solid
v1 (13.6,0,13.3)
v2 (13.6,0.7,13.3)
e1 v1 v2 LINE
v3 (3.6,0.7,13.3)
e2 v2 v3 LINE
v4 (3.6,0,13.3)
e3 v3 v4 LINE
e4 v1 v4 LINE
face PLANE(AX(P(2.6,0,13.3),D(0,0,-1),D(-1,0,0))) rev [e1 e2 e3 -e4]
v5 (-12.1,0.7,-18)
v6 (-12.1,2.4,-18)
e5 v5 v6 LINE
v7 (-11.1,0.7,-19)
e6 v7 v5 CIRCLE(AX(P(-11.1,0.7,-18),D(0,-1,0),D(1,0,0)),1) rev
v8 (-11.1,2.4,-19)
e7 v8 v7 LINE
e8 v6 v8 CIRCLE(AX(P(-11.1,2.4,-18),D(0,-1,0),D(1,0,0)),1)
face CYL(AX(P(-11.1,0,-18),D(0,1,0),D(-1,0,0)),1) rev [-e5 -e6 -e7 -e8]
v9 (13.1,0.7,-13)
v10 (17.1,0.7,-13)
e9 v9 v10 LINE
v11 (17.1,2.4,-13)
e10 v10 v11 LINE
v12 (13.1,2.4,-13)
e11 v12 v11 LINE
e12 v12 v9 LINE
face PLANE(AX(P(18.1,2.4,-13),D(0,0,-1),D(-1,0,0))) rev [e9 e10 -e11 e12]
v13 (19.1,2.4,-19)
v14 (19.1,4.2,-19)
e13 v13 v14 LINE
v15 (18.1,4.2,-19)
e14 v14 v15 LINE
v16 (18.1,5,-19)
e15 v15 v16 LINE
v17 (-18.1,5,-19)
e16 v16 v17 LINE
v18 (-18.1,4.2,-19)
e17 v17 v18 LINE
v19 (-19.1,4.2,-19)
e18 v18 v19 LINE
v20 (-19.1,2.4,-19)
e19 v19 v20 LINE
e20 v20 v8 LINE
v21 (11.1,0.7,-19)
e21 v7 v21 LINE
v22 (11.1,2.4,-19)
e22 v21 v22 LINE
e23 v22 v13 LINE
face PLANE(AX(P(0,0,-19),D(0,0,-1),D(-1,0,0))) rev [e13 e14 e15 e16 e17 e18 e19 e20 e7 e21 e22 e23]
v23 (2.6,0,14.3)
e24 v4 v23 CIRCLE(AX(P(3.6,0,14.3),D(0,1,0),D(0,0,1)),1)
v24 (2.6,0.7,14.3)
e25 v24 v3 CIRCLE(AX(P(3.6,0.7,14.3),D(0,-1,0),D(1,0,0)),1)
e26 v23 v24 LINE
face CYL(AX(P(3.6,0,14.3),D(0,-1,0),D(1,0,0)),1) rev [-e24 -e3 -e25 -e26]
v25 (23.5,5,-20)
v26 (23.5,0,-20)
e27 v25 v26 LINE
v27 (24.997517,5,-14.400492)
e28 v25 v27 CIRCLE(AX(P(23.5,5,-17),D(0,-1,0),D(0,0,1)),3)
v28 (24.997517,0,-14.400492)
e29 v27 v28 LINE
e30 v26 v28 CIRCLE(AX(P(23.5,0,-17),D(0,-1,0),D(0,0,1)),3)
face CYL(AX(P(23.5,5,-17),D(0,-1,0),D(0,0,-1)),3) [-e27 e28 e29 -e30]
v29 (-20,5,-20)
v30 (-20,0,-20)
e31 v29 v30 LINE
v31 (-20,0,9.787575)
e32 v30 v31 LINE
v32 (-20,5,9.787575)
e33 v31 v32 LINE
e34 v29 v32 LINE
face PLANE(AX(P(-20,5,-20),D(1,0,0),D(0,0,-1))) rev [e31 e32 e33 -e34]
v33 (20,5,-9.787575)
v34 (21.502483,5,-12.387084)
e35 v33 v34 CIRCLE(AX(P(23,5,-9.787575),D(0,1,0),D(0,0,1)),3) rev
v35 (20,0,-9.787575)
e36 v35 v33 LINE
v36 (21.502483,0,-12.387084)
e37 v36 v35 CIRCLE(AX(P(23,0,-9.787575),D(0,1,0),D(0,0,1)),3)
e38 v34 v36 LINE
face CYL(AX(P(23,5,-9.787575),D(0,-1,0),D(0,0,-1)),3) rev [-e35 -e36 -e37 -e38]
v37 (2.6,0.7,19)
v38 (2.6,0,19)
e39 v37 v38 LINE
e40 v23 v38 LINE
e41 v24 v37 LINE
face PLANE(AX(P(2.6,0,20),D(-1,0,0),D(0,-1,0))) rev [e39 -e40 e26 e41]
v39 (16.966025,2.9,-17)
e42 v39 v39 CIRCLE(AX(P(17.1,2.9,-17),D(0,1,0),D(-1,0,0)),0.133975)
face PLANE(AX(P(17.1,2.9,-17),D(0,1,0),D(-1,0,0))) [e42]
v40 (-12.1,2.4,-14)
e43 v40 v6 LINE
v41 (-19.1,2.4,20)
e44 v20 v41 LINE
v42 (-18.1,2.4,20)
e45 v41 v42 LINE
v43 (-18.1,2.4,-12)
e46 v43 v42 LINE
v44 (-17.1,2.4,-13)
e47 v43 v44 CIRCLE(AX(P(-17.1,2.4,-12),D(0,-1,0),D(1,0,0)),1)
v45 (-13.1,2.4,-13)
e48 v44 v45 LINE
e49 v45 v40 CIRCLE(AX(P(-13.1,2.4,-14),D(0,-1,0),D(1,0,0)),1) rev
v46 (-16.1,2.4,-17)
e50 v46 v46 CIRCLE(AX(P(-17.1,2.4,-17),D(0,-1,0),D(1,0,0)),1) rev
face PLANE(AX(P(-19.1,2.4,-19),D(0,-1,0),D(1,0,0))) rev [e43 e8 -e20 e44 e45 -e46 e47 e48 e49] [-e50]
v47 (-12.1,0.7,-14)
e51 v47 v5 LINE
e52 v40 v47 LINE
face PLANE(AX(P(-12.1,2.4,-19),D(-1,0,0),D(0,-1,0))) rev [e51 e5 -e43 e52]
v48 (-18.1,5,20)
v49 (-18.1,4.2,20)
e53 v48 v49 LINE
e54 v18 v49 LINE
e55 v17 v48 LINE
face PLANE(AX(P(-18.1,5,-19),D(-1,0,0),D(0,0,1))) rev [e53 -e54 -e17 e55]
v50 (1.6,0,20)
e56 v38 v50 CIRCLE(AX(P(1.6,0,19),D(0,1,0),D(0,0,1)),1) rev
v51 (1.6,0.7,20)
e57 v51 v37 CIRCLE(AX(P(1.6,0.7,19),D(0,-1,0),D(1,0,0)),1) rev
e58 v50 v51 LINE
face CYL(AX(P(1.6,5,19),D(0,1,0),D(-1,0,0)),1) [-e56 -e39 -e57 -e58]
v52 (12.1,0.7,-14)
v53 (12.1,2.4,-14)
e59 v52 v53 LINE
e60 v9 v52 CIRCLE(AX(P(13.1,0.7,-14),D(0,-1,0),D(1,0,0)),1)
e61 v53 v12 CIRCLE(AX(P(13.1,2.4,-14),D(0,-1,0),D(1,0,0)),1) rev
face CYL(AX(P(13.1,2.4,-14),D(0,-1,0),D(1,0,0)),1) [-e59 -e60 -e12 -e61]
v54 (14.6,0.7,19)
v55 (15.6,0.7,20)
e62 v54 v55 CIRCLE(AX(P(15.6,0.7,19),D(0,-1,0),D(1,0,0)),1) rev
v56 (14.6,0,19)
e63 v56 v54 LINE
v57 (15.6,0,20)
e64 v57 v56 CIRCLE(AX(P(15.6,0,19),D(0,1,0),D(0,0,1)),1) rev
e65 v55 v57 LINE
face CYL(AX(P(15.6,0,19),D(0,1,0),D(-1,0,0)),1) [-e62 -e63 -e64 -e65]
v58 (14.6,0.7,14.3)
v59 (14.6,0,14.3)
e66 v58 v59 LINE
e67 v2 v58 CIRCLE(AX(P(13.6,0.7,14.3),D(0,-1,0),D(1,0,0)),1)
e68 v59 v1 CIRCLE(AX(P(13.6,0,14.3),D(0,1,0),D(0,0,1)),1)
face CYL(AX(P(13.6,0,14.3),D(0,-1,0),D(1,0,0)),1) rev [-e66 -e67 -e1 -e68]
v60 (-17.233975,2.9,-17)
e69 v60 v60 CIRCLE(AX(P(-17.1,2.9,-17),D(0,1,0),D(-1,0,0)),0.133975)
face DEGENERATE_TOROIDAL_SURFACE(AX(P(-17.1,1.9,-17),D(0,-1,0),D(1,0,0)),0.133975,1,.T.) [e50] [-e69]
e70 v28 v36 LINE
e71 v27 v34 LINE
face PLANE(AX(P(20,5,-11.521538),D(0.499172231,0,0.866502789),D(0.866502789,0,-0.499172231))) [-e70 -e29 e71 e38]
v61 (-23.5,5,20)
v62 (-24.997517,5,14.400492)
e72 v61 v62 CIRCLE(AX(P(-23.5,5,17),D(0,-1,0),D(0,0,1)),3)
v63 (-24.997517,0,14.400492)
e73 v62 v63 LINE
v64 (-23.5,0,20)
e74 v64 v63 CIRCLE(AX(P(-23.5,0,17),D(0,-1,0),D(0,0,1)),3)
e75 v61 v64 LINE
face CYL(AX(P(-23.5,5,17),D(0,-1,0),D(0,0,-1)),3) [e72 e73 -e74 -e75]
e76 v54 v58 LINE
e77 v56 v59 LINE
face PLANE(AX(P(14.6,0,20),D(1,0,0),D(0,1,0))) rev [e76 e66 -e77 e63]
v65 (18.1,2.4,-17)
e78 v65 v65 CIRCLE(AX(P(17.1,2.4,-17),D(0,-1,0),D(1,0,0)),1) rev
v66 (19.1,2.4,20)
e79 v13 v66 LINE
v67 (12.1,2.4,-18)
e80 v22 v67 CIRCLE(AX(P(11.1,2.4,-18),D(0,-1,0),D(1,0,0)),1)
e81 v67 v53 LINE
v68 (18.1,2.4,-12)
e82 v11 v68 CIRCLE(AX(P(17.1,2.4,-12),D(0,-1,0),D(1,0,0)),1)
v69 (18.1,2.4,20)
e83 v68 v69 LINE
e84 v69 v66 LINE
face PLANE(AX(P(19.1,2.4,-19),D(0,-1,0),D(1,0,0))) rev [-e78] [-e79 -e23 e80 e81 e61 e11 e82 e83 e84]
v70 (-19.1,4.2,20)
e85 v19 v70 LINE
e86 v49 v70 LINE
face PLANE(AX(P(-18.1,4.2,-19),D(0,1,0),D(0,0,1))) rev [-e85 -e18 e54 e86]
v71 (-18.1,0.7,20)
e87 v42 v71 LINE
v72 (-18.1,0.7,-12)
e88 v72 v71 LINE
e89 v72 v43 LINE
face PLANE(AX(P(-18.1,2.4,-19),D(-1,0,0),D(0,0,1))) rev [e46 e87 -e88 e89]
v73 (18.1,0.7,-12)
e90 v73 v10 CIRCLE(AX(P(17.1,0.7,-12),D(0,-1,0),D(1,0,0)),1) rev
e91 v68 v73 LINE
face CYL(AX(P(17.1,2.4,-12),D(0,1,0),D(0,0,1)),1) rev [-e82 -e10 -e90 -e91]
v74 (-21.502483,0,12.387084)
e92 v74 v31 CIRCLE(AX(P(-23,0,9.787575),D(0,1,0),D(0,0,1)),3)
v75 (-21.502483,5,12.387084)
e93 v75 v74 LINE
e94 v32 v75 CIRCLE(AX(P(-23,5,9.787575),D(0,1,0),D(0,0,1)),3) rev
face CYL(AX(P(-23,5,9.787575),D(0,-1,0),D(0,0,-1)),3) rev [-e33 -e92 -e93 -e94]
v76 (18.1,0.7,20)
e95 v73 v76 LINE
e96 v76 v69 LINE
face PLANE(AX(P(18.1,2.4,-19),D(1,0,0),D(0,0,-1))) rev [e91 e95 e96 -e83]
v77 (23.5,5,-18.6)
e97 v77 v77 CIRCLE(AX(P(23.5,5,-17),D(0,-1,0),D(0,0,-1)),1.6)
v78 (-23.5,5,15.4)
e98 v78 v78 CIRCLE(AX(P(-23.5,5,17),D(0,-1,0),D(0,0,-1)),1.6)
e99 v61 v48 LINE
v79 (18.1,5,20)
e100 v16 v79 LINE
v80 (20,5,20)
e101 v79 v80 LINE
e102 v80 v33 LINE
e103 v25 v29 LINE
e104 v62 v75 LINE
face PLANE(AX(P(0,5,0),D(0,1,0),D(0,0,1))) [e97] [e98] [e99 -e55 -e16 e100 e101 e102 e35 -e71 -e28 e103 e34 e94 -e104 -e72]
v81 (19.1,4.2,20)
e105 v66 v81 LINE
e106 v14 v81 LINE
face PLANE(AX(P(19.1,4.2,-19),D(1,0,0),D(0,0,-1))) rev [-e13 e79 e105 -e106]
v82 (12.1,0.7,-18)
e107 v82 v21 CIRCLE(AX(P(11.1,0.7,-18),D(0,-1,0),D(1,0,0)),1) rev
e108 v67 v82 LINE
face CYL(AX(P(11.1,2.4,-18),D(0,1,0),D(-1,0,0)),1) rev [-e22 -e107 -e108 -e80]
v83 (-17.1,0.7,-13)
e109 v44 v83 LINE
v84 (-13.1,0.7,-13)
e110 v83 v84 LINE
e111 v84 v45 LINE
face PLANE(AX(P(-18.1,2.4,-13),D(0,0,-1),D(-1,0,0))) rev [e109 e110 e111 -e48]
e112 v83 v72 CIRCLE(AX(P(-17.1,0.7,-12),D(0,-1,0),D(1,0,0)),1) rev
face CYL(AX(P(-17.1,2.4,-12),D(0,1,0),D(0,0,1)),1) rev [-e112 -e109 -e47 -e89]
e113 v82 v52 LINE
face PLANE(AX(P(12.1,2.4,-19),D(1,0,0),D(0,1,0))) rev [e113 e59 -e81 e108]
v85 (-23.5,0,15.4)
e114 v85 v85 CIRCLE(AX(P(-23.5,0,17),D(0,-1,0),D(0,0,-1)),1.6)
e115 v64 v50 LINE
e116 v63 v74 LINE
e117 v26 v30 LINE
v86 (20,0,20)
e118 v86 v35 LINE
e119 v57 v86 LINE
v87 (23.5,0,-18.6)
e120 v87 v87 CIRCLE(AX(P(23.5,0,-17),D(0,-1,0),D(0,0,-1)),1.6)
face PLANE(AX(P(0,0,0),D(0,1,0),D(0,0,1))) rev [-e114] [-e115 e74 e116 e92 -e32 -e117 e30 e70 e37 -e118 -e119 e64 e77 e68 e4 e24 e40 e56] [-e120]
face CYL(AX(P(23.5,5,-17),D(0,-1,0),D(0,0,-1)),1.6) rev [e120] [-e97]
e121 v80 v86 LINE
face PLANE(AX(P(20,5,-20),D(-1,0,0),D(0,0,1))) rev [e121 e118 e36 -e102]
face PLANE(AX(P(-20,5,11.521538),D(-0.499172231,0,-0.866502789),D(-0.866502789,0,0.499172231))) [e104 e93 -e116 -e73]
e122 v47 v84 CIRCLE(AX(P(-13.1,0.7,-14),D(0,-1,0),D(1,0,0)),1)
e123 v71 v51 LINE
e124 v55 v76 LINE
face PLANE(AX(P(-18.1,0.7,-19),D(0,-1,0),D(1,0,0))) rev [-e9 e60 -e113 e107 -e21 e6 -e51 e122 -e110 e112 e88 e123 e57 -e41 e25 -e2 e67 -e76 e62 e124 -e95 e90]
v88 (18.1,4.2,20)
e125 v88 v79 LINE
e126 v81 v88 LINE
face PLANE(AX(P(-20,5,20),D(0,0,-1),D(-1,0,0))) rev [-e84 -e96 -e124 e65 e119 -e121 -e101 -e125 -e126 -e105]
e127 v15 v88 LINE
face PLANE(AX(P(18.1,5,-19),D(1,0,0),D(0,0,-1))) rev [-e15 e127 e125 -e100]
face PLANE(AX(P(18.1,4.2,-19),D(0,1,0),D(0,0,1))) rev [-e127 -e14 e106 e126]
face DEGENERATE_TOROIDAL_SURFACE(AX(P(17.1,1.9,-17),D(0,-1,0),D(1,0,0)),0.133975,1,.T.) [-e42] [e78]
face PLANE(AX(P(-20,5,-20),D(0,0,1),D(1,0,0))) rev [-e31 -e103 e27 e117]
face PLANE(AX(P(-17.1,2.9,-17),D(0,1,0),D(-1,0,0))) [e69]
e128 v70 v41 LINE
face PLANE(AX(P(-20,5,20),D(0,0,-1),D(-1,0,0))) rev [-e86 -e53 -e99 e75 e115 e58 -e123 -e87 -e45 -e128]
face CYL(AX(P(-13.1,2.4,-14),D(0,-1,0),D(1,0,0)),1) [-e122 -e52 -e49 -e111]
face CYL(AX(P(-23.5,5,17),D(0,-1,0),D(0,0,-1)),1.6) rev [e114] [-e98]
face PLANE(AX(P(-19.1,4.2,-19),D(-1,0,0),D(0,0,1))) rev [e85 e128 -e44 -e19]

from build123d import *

# Parameters (mm, degrees)
SKETCH1_W           = 40
SKETCH1_H           = 40
BOSS_EXTRUDE1_DEPTH = 5
CUT_EXTRUDE2_DEPTH  = 39
SKETCH4_W           = 12
SKETCH4_H           = 6.7
CUT_EXTRUDE3_DEPTH  = 29.609264234
SKETCH5_W           = 6
SKETCH5_H           = 6
BOSS_EXTRUDE2_DEPTH = 1.7
FILLET1_R           = 1
SKETCH6_R           = 1
BOSS_EXTRUDE3_DEPTH = 0.5
FILLET2_R           = 1
SKETCH7_R           = 1.6
BOSS_EXTRUDE4_DEPTH = 5
FILLET3_R           = 3


with BuildPart() as part:
    # Sketch1 → Boss-Extrude1 (new body)
    with BuildSketch(Plane(origin=(0, 0, 0), x_dir=(1, 0, 0), z_dir=(0, 1, 0))):
        Rectangle(SKETCH1_W, SKETCH1_H)
    extrude(amount=BOSS_EXTRUDE1_DEPTH)

    # Sketch3 → Cut-Extrude2 (cut)
    with BuildSketch(Plane.XY.offset(20)):
        Polygon((-18.1, 5), (-18.1, 4.2), (-19.1, 4.2), (-19.1, 2.4), (-18.1, 2.4), (-18.1, 0.7), (18.1, 0.7), (18.1, 2.4), (19.1, 2.4), (19.1, 4.2), (18.1, 4.2), (18.1, 5), align=None)
    extrude(amount=-CUT_EXTRUDE2_DEPTH, mode=Mode.SUBTRACT)

    # Sketch4 → Cut-Extrude3 (cut, through all)
    with BuildSketch(Plane(origin=(0, 0.7, 0), x_dir=(1, 0, 0), z_dir=(0, 1, 0))):
        with Locations((8.6, -16.65)):
            Rectangle(SKETCH4_W, SKETCH4_H)
    extrude(amount=-CUT_EXTRUDE3_DEPTH, mode=Mode.SUBTRACT)

    # Sketch5 → Boss-Extrude2 (add)
    with BuildSketch(Plane(origin=(0, 0.7, 0), x_dir=(1, 0, 0), z_dir=(0, 1, 0))):
        with Locations((-15.1, 16)):
            Rectangle(SKETCH5_W, SKETCH5_H)
        with Locations((15.1, 16)):
            Rectangle(SKETCH5_W, SKETCH5_H)
    extrude(amount=BOSS_EXTRUDE2_DEPTH)

    # Fillet1
    fillet1_edges = [part.edges().sort_by_distance(p)[0] for p in [
        (2.6, 0.35, 20),
        (2.6, 0.35, 13.3),
        (14.6, 0.35, 13.3),
        (14.6, 0.35, 20),
        (-18.1, 1.55, -13),
        (-12.1, 1.55, -13),
        (-12.1, 1.55, -19),
        (18.1, 1.55, -13),
        (12.1, 1.55, -19),
        (12.1, 1.55, -13),
    ]]
    fillet(fillet1_edges, radius=FILLET1_R)

    # Sketch6 → Boss-Extrude3 (add)
    with BuildSketch(Plane(origin=(0, 2.4, 0), x_dir=(1, 0, 0), z_dir=(0, 1, 0))):
        with Locations((-17.1, 17)):
            Circle(SKETCH6_R)
        with Locations((17.1, 17)):
            Circle(SKETCH6_R)
    extrude(amount=BOSS_EXTRUDE3_DEPTH)

    # Fillet2
    # the kernel refuses this fillet: 1 mm, written as the material it takes off along each edge
    with BuildSketch(Plane(origin=(-17.1, 2.9, -17), x_dir=(1, 0, 0), z_dir=(0, 0, 1))) as fillet2_piece_1:
        with BuildLine():
            CenterArc((0.133974596, -1), FILLET2_R, 30, 60)
            Line((0.133974596, 0), (0.133974596, 0.02))
            Line((0.133974596, 0.02), (1, 0.02))
            Line((1, 0.02), (1.02, 0))
            ThreePointArc((1.02, 0), (1.02, -0.25), (1.017320508, -0.49))
            Line((1.017320508, -0.49), (1, -0.5))
        make_face()
    revolve(axis=Axis((-17.1, 2.9, -17), (0, 1, 0)), mode=Mode.SUBTRACT)
    with BuildSketch(Plane(origin=(17.1, 2.9, -17), x_dir=(1, 0, 0), z_dir=(0, 0, 1))) as fillet2_piece_2:
        with BuildLine():
            CenterArc((0.133974596, -1), FILLET2_R, 30, 60)
            Line((0.133974596, 0), (0.133974596, 0.02))
            Line((0.133974596, 0.02), (1, 0.02))
            Line((1, 0.02), (1.02, 0))
            ThreePointArc((1.02, 0), (1.02, -0.25), (1.017320508, -0.49))
            Line((1.017320508, -0.49), (1, -0.5))
        make_face()
    revolve(axis=Axis((17.1, 2.9, -17), (0, 1, 0)), mode=Mode.SUBTRACT)

    # Sketch7 → Boss-Extrude4 (add)
    # profile 1 of 2: a face of its own
    with BuildSketch(Plane.XZ):
        with BuildLine():
            Line((-20, 20), (-20, 11.521537766))
            Line((-20, 11.521537766), (-24.997516692, 14.400491632))
            ThreePointArc((-24.997516692, 14.400491632), (-26.398148125, 17.775072543), (-23.5, 20))
            Line((-23.5, 20), (-20, 20))
        make_face()
        with Locations(Location((-23.5, 17, 0), (0, 0, 270))):
            Circle(SKETCH7_R, mode=Mode.SUBTRACT)
    # profile 2 of 2: a face of its own
    with BuildSketch(Plane.XZ):
        with BuildLine():
            Line((20, -20), (20, -11.521537766))
            Line((20, -11.521537766), (24.997516692, -14.400491632))
            ThreePointArc((24.997516692, -14.400491632), (26.398148125, -17.775072543), (23.5, -20))
            Line((23.5, -20), (20, -20))
        make_face()
        with Locations(Location((23.5, -17, 0), (0, 0, 270))):
            Circle(SKETCH7_R, mode=Mode.SUBTRACT)
    extrude(amount=-BOSS_EXTRUDE4_DEPTH)

    # Fillet3
    fillet3_edges = [part.edges().sort_by_distance(p)[0] for p in [
        (-20, 2.5, 11.521537766),
        (20, 2.5, -11.521537766),
    ]]
    fillet(fillet3_edges, radius=FILLET3_R)


solid = part.part
